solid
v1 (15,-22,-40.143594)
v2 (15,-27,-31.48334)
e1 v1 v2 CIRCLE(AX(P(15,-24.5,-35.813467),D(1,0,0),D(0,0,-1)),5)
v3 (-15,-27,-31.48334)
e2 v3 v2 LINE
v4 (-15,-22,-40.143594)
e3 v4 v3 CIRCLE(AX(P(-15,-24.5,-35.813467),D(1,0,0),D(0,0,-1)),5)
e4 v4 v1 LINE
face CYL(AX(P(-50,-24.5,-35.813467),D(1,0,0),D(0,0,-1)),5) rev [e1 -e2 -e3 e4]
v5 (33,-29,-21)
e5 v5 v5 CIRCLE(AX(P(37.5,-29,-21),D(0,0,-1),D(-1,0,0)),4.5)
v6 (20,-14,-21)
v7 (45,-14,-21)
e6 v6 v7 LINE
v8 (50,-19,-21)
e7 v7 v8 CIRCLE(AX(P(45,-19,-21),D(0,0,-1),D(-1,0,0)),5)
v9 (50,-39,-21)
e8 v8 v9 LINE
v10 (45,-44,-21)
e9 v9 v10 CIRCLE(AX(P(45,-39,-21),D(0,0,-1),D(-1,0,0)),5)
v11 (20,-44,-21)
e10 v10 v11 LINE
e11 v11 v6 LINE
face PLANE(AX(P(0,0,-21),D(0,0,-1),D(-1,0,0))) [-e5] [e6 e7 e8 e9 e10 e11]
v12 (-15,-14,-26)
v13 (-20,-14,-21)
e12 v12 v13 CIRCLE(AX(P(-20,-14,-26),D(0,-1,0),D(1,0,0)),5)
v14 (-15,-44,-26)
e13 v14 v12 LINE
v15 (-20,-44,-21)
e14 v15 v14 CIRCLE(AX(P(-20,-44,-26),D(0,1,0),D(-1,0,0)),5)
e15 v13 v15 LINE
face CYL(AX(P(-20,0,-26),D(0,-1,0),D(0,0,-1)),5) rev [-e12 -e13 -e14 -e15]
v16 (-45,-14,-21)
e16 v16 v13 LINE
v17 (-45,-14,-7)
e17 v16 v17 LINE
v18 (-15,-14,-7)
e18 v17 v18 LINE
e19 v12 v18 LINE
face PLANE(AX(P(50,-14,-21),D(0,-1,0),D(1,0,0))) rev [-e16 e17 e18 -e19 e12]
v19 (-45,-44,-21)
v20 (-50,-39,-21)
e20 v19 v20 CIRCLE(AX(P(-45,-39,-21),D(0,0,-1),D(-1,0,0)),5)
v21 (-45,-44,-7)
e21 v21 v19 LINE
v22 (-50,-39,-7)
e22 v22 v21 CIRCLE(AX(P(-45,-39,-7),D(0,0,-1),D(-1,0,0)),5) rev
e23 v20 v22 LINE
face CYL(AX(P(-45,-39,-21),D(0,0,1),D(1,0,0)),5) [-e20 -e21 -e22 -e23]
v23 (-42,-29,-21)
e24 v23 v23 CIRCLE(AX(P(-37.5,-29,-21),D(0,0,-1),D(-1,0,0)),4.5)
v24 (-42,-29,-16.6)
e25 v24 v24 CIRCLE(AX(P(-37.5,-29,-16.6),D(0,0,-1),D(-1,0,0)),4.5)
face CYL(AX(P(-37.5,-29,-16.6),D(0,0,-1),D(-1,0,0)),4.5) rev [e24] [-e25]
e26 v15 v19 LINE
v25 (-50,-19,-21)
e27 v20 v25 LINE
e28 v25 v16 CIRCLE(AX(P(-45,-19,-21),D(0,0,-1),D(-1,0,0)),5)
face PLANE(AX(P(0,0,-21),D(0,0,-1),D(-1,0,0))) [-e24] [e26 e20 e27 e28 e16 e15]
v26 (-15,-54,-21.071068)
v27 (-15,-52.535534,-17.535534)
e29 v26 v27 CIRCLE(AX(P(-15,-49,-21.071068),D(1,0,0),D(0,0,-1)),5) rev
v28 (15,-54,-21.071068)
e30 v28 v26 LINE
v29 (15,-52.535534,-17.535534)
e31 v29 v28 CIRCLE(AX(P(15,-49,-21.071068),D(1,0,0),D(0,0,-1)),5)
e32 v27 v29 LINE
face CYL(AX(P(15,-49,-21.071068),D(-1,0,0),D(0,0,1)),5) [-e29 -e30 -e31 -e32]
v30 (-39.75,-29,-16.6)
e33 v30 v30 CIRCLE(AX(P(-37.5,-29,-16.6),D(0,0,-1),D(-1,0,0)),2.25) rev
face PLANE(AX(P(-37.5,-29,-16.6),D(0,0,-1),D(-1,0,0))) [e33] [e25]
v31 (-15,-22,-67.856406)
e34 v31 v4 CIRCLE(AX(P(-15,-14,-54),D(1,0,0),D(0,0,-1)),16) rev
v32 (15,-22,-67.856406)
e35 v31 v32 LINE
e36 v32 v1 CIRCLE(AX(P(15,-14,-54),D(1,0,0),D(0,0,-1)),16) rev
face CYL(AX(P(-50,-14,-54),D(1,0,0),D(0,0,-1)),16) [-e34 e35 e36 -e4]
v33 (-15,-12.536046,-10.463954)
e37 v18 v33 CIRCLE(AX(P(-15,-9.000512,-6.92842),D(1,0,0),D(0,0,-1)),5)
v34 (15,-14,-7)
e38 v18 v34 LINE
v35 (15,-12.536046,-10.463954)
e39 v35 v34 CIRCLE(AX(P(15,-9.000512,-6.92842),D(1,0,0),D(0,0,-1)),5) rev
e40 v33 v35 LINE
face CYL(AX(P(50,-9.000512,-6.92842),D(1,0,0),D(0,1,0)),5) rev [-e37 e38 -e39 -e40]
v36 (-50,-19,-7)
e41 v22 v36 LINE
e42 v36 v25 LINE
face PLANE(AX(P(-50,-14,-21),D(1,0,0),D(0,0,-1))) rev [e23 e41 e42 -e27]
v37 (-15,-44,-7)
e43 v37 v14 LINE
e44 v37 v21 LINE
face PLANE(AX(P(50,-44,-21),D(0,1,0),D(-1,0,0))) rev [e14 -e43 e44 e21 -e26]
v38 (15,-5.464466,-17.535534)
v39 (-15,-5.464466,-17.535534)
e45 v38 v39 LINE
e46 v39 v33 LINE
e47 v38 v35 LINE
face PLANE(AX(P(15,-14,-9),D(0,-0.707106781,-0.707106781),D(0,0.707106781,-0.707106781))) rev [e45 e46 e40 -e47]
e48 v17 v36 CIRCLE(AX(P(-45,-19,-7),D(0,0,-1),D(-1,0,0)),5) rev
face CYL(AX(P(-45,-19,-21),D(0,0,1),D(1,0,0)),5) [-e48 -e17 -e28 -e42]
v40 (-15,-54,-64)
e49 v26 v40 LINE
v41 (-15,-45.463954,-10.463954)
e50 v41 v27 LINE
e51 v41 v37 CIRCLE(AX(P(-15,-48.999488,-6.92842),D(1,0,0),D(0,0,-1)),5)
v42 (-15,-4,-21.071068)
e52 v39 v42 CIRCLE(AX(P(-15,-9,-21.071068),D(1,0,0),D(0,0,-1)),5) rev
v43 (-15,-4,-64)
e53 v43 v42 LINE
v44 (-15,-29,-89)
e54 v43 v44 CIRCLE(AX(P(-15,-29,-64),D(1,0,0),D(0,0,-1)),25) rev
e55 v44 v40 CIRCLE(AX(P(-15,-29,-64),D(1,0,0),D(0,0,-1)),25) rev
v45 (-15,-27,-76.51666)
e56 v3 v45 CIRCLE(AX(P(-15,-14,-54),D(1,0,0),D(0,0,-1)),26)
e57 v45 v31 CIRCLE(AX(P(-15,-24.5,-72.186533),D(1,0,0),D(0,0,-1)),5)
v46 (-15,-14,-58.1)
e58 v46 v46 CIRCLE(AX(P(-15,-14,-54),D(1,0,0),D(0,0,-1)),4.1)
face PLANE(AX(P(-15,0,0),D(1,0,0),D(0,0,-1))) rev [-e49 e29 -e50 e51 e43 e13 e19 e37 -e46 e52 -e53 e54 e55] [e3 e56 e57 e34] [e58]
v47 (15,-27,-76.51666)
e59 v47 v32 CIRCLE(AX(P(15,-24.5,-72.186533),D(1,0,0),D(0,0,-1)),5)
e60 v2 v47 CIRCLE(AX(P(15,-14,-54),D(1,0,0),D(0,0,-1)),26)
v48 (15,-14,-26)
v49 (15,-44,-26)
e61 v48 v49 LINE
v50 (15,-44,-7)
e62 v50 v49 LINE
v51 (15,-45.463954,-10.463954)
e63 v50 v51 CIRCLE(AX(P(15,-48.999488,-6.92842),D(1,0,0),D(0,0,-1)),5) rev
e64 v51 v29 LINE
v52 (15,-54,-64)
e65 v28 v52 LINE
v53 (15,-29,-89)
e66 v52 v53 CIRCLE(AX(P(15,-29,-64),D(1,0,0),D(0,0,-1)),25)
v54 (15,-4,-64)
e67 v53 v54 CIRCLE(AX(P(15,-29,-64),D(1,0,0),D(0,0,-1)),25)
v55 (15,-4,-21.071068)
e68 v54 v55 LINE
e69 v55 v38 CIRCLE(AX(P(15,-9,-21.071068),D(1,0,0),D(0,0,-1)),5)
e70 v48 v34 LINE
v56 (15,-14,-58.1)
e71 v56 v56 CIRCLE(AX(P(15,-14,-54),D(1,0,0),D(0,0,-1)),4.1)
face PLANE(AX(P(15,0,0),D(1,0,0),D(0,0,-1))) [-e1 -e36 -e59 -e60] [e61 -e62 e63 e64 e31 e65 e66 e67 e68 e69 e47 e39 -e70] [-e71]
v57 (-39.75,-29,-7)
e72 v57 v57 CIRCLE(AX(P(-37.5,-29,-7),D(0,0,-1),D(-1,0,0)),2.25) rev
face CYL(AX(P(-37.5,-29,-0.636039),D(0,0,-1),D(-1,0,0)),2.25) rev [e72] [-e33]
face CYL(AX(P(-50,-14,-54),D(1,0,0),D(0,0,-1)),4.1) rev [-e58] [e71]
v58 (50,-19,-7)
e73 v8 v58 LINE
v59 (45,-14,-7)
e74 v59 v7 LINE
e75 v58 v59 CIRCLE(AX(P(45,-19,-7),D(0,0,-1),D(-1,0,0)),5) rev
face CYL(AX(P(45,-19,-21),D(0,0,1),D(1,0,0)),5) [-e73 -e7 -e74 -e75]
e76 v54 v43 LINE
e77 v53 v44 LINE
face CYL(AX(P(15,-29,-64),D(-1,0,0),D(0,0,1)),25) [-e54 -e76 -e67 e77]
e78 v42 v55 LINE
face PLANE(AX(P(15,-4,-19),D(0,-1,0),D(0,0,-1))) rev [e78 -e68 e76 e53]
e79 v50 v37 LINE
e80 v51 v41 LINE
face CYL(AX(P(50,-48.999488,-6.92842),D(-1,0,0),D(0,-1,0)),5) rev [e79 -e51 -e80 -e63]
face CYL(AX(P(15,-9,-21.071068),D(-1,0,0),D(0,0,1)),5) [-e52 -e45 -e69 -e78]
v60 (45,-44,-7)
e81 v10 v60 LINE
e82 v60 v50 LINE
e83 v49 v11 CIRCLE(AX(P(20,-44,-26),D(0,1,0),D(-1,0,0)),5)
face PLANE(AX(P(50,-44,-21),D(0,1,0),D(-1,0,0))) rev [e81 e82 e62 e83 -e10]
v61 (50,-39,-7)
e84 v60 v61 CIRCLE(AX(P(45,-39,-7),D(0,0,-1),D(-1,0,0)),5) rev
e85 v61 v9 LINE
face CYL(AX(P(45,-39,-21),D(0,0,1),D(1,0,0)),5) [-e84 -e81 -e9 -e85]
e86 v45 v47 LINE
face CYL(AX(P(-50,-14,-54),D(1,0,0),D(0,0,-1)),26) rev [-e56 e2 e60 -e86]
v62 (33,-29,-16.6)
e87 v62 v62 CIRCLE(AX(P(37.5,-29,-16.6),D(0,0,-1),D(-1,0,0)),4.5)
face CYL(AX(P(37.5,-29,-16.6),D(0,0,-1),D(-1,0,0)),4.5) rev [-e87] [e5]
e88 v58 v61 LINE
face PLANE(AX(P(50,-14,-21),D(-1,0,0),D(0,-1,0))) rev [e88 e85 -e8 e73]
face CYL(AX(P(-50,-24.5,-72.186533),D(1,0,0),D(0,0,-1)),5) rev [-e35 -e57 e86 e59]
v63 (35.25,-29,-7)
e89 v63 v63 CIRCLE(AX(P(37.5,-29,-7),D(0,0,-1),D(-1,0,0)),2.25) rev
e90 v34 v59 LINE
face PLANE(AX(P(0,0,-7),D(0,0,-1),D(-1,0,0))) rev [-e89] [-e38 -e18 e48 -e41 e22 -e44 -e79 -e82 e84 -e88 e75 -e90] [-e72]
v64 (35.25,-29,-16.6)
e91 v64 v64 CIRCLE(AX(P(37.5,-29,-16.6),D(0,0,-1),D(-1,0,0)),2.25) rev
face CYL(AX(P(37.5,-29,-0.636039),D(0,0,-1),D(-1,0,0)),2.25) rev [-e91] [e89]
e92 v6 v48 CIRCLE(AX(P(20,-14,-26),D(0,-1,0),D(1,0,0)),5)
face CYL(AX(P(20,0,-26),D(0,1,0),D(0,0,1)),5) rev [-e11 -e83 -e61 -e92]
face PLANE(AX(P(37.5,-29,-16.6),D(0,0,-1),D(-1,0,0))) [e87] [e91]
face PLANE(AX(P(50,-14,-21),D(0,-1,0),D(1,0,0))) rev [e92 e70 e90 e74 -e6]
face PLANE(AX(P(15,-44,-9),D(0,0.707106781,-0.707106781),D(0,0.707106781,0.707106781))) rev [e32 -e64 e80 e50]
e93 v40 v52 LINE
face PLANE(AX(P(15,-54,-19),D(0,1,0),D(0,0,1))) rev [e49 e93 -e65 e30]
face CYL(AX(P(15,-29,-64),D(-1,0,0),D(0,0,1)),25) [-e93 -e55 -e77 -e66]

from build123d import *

# Parameters (mm, degrees)
SKETCH1_W               = 100
SKETCH1_H               = 30
BOSS_EXTRUDE1_DEPTH     = 14
SKETCH2_R               = 2.25
CUT_EXTRUDE1_DEPTH      = 14
SKETCH3_R               = 4.5
CUT_EXTRUDE2_DEPTH      = 4.4
BOSS_EXTRUDE2_DEPTH     = 15
CUT_EXTRUDE3_DEPTH      = 116.485929879
CUT_EXTRUDE3_DEPTH_BACK = 116.485929879
SKETCH6_R               = 4.1
FILLET1_R               = 25
CUT_EXTRUDE5_DEPTH      = 116.485929879
CUT_EXTRUDE5_DEPTH_BACK = 116.485929879
FILLET2_R               = 5


# Some blends are built 0.0001 mm under size
with BuildPart() as part:
    # Sketch1 → Boss-Extrude1 (new body)
    with BuildSketch(Plane(origin=(0, 0, -7), x_dir=(-1, 0, 0), z_dir=(0, 0, -1))):
        with Locations((0, -29)):
            Rectangle(SKETCH1_W, SKETCH1_H)
    extrude(amount=BOSS_EXTRUDE1_DEPTH)

    # Sketch2 → Cut-Extrude1 (cut)
    with BuildSketch(Plane(origin=(0, 0, -21), x_dir=(-1, 0, 0), z_dir=(0, 0, -1))):
        with Locations((-37.5, -29)):
            Circle(SKETCH2_R)
        with Locations((37.5, -29)):
            Circle(SKETCH2_R)
    extrude(amount=-CUT_EXTRUDE1_DEPTH, mode=Mode.SUBTRACT)

    # Sketch3 → Cut-Extrude2 (cut)
    with BuildSketch(Plane(origin=(0, 0, -21), x_dir=(-1, 0, 0), z_dir=(0, 0, -1))):
        with Locations((-37.5, -29)):
            Circle(SKETCH3_R)
        with Locations((37.5, -29)):
            Circle(SKETCH3_R)
    extrude(amount=-CUT_EXTRUDE2_DEPTH, mode=Mode.SUBTRACT)

    # Sketch5 → Boss-Extrude2 (add, symmetric)
    with BuildSketch(Plane(origin=(0, 0, 0), x_dir=(0, 0, -1), z_dir=(1, 0, 0))):
        Polygon((9, -14), (19, -4), (89, -4), (89, -54), (19, -54), (9, -44), align=None)
    extrude(amount=BOSS_EXTRUDE2_DEPTH, both=True)

    # Sketch6 → Cut-Extrude3 (cut, two sides: drawn at the far end of the back side and taken through both)
    with BuildSketch(Plane(origin=(0, 0, 0), x_dir=(0, 0, -1), z_dir=(1, 0, 0)).offset(-CUT_EXTRUDE3_DEPTH_BACK)):
        with Locations((54, -14)):
            Circle(SKETCH6_R)
    extrude(amount=CUT_EXTRUDE3_DEPTH + CUT_EXTRUDE3_DEPTH_BACK, mode=Mode.SUBTRACT)

    # Fillet1
    fillet1_edges = [part.edges().sort_by_distance(p)[0] for p in [
        (0, -4, -89),
        (0, -54, -89),
    ]]
    fillet(fillet1_edges, radius=FILLET1_R - 0.0001)  # a hair under: the kernel refuses the full size

    # Sketch7 → Cut-Extrude5 (cut, two sides: drawn at the far end of the back side and taken through both)
    with BuildSketch(Plane(origin=(0, 0, 0), x_dir=(0, 0, -1), z_dir=(1, 0, 0)).offset(-CUT_EXTRUDE5_DEPTH_BACK)):
        with BuildLine():
            ThreePointArc((31.483339502, -27), (54, -40), (76.516660498, -27))
            ThreePointArc((76.516660498, -27), (74.686533479, -20.169872981), (67.856406461, -22))
            ThreePointArc((67.856406461, -22), (54, -30), (40.143593539, -22))
            ThreePointArc((40.143593539, -22), (33.313466521, -20.169872981), (31.483339502, -27))
        make_face()
    extrude(amount=CUT_EXTRUDE5_DEPTH + CUT_EXTRUDE5_DEPTH_BACK, mode=Mode.SUBTRACT)

    # Fillet2
    # the kernel refuses this fillet: 5 mm, written as the material it adds along each edge
    with BuildSketch(Plane(origin=(-15, -14, -21), x_dir=(0, 0, -1), z_dir=(0, -1, 0))) as fillet2_piece_1:
        with BuildLine():
            CenterArc((FILLET2_R, -FILLET2_R), FILLET2_R, 90, 90)
            Line((0, -FILLET2_R), (0, 0))
            Line((0, 0), (FILLET2_R, 0))
        make_face()
    extrude(amount=30)
    with BuildSketch(Plane(origin=(15, -14, -21), x_dir=(0, 0, -1), z_dir=(0, -1, 0))) as fillet2_piece_2:
        with BuildLine():
            CenterArc((FILLET2_R, FILLET2_R), FILLET2_R, 180, 90)
            Line((0, FILLET2_R), (0, 0))
            Line((0, 0), (FILLET2_R, 0))
        make_face()
    extrude(amount=30)
    with BuildSketch(Plane(origin=(-15, -14, -9), x_dir=(0, 0.707106781186544, -0.7071067811865509), z_dir=(1, 0, 0))) as fillet2_piece_3_section:
        with BuildLine():
            CenterArc((FILLET2_R * 0.414213562373, FILLET2_R), FILLET2_R, 225, 45)
            Line((-FILLET2_R * 0.292893218813, FILLET2_R * 0.292893218813), (0, 0))
            Line((0, 0), (FILLET2_R * 0.414213562373, 0))
        make_face()
    fillet2_piece_3 = extrude(amount=30, mode=Mode.PRIVATE)
    fillet2_piece_3 = split(fillet2_piece_3, bisect_by=Plane(origin=(0, -13.688256851, -7), z_dir=(0, 0, -1)), keep=Keep.TOP, mode=Mode.PRIVATE)
    add(fillet2_piece_3)
    with BuildSketch(Plane(origin=(-15, -44, -9), x_dir=(0, -0.707106781186544, -0.7071067811865509), z_dir=(1, 0, 0))) as fillet2_piece_4_section:
        with BuildLine():
            CenterArc((FILLET2_R * 0.414213562373, -FILLET2_R), FILLET2_R, 90, 45)
            Line((-FILLET2_R * 0.292893218813, -FILLET2_R * 0.292893218813), (0, 0))
            Line((0, 0), (FILLET2_R * 0.414213562373, 0))
        make_face()
    fillet2_piece_4 = extrude(amount=30, mode=Mode.PRIVATE)
    fillet2_piece_4 = split(fillet2_piece_4, bisect_by=Plane(origin=(0, -44.311743149, -7), z_dir=(0, 0, -1)), keep=Keep.TOP, mode=Mode.PRIVATE)
    add(fillet2_piece_4)
    # the kernel refuses this fillet: 5 mm, written as the material it takes off along each edge
    with BuildSketch(Plane(origin=(-20.17766953, -54, -19), x_dir=(0, 0, -1), z_dir=(1, 0, 0))) as fillet2_2_piece_1:
        with BuildLine():
            CenterArc((FILLET2_R * 0.414213562373, FILLET2_R), FILLET2_R, 225, 45)
            Line((-FILLET2_R * 0.292893218813, FILLET2_R * 0.292893218813), (0, 0))
            Line((0, 0), (FILLET2_R * 0.414213562373, 0))
        make_face()
    extrude(amount=40.355339059, mode=Mode.SUBTRACT)
    with BuildSketch(Plane(origin=(20.17766953, -4, -19), x_dir=(0, -0.7071067811865441, 0.707106781186551), z_dir=(-1, 0, 0))) as fillet2_2_piece_2:
        with BuildLine():
            CenterArc((FILLET2_R * 0.414213562373, -FILLET2_R), FILLET2_R, 90, 45)
            Line((-FILLET2_R * 0.292893218813, -FILLET2_R * 0.292893218813), (0, 0))
            Line((0, 0), (FILLET2_R * 0.414213562373, 0))
        make_face()
    extrude(amount=40.355339059, mode=Mode.SUBTRACT)
    with BuildSketch(Plane(origin=(50, -14, 5.5), x_dir=(-1, 0, 0), z_dir=(0, 0, -1)), Plane(origin=(50, -44, 5.5), x_dir=(0, 1, 0), z_dir=(0, 0, -1))) as fillet2_2_piece_3:
        with BuildLine():
            CenterArc((FILLET2_R, -FILLET2_R), FILLET2_R, 90, 90)
            Line((0, -FILLET2_R), (0, 0))
            Line((0, 0), (FILLET2_R, 0))
        make_face()
    extrude(amount=39, mode=Mode.SUBTRACT)
    with BuildSketch(Plane(origin=(-50, -14, 5.5), x_dir=(1, 0, 0), z_dir=(0, 0, -1)), Plane(origin=(-50, -44, 5.5), x_dir=(0, 1, 0), z_dir=(0, 0, -1))) as fillet2_2_piece_4:
        with BuildLine():
            CenterArc((FILLET2_R, FILLET2_R), FILLET2_R, 180, 90)
            Line((0, FILLET2_R), (0, 0))
            Line((0, 0), (FILLET2_R, 0))
        make_face()
    extrude(amount=39, mode=Mode.SUBTRACT)


solid = part.part
